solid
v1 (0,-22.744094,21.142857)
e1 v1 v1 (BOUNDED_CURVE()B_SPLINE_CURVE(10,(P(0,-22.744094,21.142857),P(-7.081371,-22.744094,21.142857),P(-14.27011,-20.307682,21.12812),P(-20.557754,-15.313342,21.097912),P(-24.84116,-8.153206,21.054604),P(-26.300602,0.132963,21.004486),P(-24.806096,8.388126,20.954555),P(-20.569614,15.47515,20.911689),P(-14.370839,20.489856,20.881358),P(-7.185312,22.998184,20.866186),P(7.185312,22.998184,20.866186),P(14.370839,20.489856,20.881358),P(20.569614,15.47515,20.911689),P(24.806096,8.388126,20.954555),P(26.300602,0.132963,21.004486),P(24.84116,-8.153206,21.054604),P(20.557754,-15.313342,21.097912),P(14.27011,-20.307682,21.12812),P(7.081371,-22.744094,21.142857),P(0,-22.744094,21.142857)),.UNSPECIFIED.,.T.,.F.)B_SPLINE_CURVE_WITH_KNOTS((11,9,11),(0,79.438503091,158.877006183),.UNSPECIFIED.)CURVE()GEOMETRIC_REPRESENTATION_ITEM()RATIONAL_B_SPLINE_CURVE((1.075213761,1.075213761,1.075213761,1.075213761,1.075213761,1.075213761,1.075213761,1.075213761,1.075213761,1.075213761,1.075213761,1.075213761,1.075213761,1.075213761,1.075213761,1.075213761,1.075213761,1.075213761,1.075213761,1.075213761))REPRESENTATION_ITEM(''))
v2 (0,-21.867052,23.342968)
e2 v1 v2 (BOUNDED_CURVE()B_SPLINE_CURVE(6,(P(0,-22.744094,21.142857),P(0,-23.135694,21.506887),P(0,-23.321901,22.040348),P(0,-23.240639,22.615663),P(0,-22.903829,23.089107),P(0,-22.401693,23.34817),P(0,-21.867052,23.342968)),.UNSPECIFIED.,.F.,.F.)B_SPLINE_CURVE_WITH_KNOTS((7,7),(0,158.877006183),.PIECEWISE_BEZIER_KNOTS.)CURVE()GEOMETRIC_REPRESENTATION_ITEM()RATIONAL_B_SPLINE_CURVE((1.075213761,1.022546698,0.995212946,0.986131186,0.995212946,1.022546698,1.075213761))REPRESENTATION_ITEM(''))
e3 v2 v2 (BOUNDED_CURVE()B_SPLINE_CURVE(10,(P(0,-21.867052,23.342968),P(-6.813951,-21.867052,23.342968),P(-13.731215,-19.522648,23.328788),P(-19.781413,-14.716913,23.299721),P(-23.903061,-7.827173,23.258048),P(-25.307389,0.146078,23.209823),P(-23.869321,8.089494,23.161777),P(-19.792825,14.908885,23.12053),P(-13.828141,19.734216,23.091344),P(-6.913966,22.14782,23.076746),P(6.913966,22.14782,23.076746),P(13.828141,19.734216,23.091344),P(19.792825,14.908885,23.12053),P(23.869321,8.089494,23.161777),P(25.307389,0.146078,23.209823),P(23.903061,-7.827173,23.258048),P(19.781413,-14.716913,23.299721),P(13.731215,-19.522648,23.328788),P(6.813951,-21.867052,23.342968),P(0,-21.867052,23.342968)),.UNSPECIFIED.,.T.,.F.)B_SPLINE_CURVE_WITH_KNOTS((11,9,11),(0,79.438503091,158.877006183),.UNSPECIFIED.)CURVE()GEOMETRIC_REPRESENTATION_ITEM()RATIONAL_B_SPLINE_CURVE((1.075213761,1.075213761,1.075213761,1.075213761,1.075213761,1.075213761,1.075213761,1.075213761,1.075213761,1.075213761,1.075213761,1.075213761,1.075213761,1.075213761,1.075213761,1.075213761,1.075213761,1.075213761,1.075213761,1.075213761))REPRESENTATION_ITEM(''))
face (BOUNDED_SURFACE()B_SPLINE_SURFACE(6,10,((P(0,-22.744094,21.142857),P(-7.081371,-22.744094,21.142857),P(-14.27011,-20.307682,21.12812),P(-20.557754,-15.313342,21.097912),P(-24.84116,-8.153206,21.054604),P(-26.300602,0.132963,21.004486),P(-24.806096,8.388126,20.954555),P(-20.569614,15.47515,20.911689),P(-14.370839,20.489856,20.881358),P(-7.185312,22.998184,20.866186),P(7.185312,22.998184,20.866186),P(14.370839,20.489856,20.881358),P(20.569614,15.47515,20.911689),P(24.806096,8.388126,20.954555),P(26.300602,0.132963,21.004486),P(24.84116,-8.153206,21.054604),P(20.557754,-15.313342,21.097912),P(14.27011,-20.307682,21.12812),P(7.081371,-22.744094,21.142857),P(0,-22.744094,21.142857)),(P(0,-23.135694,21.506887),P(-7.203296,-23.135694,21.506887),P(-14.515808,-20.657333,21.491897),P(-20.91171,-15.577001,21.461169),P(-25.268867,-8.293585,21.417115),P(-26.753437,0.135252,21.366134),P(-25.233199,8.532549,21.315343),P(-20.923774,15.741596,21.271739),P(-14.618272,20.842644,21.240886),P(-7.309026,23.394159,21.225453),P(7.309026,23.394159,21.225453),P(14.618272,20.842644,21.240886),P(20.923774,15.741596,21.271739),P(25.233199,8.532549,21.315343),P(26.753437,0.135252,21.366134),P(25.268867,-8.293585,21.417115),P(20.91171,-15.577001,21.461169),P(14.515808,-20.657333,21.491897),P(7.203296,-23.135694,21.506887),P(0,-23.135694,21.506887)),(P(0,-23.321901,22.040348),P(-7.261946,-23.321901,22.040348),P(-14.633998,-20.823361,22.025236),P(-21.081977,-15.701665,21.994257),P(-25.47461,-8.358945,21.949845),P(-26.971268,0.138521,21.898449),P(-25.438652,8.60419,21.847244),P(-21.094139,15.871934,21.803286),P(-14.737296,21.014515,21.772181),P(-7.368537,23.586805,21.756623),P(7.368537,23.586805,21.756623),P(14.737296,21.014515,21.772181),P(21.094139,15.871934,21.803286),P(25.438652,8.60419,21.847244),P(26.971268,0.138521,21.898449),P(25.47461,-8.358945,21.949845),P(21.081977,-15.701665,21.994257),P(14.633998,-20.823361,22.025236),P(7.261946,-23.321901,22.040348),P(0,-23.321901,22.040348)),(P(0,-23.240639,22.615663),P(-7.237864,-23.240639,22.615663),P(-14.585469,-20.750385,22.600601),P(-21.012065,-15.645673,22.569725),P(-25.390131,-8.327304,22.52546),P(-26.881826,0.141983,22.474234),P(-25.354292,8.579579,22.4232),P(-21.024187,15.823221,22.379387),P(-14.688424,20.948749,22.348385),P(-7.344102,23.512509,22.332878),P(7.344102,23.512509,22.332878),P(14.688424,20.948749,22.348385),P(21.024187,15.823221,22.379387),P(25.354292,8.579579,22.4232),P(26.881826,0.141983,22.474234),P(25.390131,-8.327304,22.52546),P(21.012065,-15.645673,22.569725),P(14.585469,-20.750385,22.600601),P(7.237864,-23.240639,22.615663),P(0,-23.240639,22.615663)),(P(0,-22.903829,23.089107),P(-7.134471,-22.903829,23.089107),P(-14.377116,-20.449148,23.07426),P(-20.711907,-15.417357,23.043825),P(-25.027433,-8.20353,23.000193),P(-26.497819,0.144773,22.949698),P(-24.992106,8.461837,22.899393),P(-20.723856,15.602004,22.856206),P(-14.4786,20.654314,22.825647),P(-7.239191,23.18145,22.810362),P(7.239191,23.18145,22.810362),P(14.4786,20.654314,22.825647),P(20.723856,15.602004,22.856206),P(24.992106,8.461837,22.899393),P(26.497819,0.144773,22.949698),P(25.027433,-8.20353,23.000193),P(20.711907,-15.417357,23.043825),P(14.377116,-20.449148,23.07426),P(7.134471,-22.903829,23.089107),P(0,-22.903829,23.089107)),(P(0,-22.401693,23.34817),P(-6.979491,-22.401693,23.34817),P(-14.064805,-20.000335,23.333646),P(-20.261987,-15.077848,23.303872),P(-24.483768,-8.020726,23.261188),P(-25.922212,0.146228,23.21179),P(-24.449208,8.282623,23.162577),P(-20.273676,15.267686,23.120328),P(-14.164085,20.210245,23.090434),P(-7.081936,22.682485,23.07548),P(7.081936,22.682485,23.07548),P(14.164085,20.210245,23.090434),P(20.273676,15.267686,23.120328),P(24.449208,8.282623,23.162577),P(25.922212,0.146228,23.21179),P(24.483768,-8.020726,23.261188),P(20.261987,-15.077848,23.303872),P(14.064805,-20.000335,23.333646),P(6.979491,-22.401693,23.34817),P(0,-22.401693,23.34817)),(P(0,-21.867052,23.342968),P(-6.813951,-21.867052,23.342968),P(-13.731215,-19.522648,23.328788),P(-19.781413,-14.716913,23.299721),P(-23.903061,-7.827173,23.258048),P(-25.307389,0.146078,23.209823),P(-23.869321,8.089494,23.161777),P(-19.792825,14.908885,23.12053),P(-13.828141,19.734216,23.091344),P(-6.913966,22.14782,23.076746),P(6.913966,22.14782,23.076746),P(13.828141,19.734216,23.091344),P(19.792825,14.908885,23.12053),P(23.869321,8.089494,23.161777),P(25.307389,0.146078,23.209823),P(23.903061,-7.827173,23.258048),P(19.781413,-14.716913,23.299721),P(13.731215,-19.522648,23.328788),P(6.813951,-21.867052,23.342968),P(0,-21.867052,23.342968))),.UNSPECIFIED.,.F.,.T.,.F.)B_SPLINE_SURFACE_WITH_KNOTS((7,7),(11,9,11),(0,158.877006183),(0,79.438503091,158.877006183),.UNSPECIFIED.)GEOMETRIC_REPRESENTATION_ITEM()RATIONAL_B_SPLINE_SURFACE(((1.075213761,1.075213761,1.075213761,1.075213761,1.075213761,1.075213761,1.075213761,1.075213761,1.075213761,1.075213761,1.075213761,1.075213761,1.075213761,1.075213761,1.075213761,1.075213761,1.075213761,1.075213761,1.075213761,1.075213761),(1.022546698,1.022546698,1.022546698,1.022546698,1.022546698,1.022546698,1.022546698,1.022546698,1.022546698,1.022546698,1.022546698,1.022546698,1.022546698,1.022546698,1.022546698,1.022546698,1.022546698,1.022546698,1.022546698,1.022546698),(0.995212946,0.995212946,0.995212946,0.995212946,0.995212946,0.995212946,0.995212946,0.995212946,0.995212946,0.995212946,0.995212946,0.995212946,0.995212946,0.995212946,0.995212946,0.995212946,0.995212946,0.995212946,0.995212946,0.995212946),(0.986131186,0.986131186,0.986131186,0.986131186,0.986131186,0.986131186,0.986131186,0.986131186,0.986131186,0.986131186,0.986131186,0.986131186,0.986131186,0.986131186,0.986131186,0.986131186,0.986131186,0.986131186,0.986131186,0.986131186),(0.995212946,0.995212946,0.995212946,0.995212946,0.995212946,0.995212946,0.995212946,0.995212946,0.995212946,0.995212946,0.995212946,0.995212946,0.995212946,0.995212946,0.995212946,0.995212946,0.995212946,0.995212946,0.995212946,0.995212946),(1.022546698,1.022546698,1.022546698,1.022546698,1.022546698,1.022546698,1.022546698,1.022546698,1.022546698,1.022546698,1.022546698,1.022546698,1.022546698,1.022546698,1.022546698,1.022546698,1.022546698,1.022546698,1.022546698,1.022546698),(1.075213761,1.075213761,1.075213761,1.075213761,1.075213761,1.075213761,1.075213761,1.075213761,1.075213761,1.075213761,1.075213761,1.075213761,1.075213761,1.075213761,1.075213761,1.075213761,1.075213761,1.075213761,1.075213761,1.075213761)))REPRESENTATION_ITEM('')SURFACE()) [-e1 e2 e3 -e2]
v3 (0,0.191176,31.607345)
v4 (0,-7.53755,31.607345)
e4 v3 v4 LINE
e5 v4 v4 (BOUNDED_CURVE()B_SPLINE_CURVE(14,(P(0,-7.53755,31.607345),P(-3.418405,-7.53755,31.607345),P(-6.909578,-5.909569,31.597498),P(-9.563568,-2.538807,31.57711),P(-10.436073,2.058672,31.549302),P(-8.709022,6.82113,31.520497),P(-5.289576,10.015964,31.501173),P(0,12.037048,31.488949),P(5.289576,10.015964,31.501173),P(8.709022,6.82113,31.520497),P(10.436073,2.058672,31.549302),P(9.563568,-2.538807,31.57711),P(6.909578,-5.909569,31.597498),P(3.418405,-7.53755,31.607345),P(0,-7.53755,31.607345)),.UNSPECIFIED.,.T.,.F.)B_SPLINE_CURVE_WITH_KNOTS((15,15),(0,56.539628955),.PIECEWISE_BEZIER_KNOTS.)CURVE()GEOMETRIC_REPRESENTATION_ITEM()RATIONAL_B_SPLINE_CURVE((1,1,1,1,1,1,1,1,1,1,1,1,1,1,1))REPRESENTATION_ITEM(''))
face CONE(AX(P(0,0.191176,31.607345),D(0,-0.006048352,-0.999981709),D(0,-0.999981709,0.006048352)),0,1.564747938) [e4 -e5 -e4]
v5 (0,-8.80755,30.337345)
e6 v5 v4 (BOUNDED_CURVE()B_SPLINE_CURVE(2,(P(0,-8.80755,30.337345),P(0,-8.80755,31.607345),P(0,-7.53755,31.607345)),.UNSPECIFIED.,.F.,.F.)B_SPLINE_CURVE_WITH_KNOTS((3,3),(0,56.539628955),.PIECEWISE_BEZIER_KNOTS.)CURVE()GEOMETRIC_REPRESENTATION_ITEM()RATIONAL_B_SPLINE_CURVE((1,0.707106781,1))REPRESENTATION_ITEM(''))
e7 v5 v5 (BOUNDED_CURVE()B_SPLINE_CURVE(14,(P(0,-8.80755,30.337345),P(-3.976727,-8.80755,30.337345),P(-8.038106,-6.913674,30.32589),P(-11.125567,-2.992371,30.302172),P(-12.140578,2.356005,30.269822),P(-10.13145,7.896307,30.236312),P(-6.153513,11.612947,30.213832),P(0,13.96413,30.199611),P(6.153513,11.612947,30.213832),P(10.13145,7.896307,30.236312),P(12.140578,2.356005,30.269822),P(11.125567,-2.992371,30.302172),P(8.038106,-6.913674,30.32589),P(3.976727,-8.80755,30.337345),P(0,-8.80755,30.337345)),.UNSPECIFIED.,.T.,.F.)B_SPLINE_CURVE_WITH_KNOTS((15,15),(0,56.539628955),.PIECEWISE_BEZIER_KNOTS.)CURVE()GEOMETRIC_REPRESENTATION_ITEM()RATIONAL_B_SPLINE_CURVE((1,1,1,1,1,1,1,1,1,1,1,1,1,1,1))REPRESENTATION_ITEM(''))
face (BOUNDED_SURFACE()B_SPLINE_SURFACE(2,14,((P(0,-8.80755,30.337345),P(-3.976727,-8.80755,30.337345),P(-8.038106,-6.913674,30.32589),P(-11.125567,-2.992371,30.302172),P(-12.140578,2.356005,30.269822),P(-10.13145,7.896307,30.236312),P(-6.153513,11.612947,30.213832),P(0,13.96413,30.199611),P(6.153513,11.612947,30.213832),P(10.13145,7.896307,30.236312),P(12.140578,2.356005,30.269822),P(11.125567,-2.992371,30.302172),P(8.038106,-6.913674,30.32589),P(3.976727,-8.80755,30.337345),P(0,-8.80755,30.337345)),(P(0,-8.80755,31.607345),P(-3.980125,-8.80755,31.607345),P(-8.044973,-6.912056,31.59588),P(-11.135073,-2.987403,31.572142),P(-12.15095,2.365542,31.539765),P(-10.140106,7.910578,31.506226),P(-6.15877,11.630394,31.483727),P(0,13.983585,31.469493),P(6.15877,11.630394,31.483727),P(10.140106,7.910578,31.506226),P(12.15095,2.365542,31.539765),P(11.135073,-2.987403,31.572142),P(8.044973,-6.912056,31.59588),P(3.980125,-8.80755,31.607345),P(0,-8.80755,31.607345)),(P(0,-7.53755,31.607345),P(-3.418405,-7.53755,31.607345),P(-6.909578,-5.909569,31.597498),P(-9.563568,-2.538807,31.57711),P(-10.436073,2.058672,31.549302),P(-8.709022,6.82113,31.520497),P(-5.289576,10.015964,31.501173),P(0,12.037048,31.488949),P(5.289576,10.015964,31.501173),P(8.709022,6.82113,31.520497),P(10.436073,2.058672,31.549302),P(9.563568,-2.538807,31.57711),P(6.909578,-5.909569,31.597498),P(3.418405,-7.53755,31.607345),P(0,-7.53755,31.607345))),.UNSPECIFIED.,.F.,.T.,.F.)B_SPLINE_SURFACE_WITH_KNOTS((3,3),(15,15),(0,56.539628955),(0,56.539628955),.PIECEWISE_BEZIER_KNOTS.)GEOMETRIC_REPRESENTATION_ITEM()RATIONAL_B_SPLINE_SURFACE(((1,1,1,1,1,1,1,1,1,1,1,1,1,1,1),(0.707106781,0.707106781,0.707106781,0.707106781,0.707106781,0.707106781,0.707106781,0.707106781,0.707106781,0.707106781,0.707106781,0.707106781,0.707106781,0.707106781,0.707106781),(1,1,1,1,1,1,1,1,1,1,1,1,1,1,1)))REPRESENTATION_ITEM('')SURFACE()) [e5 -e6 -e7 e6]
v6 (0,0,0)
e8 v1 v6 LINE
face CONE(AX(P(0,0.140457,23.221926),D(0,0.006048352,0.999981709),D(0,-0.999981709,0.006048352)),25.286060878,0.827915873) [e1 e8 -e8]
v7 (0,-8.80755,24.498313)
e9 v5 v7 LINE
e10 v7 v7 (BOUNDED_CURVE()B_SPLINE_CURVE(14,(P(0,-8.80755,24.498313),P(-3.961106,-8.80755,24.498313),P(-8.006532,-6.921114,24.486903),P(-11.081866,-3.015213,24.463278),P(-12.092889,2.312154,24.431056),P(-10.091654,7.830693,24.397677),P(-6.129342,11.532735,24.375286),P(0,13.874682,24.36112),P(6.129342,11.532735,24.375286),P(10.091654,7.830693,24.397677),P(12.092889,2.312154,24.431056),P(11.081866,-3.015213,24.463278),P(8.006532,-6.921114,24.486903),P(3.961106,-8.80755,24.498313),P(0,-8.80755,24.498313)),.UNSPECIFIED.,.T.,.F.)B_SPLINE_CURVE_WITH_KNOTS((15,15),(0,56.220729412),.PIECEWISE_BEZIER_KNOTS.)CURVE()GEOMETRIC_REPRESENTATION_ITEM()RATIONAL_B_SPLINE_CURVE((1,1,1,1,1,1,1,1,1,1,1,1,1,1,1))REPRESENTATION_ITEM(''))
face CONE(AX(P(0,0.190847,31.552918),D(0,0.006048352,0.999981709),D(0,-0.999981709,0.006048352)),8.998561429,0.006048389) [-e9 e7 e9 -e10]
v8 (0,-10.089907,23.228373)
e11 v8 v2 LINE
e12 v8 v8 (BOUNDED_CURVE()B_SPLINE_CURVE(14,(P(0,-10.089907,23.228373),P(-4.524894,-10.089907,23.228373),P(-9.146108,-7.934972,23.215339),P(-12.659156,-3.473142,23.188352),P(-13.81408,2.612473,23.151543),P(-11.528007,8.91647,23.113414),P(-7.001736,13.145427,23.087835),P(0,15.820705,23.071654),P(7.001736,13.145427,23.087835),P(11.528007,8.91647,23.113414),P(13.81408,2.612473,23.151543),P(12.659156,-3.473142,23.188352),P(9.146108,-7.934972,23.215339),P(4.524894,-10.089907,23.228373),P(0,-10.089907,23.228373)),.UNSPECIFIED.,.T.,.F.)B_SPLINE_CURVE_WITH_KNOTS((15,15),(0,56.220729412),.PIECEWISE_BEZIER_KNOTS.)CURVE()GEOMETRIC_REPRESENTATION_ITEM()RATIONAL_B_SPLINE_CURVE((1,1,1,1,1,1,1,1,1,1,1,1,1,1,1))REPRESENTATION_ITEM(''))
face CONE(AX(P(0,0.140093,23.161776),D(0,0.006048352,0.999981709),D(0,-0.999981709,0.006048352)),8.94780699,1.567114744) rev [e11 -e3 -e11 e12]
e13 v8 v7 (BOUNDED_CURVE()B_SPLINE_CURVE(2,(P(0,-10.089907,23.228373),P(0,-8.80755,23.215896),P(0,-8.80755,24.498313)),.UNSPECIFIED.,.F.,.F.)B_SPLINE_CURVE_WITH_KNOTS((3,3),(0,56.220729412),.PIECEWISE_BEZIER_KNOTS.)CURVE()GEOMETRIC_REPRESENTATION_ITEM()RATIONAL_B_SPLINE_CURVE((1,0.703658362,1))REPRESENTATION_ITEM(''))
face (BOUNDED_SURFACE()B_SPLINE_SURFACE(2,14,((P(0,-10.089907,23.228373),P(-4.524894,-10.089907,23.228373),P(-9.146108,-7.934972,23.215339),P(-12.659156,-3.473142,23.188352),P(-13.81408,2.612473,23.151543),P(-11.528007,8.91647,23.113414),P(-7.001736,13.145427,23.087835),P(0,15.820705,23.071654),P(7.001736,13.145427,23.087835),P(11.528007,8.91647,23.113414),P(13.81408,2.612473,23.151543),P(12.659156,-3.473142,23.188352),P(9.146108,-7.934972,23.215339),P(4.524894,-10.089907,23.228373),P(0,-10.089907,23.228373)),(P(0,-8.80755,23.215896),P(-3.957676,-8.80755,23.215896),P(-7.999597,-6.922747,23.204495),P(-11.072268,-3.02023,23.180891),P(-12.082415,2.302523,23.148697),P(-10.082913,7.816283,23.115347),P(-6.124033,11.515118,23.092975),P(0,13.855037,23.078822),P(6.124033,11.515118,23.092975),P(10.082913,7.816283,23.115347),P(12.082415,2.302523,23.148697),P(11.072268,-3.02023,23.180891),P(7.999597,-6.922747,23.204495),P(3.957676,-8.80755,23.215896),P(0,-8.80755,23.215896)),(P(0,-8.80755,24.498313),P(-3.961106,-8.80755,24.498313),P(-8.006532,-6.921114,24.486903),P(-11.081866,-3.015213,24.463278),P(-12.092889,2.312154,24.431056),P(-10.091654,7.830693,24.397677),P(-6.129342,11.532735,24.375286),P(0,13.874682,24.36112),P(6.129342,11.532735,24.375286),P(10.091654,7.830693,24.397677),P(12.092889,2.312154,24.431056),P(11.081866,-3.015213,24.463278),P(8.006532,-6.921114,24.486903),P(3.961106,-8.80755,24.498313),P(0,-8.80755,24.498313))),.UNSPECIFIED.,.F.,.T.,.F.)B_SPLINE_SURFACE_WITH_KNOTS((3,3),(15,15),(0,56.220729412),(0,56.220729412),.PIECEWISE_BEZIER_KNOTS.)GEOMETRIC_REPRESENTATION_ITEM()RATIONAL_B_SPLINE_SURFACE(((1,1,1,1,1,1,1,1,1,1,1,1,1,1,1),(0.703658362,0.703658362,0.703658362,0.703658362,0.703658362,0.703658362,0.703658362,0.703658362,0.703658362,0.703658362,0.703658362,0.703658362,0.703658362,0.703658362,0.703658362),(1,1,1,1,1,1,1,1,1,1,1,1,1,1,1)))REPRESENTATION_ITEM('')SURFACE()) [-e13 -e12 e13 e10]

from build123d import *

# Parameters (mm, degrees)
F4_R = 1.27
F5_R = 1.27


# Not quite as in the source:
# - the program builds the solid bodies; features that only make, move or delete a surface that nothing else refers to are left out


with BuildPart() as f1:
    # F0 (on Right) → F1 (revolve)
    with BuildSketch(Plane.YZ):
        Polygon((-25.1451414078, 23.3748648316), (0, 0), (0.1911758445, 31.6073447466), (-8.8075501844, 31.6073447466), (-8.8075501844, 23.2158955187), align=None)
    revolve(axis=Axis((0, 0.0955879223, 15.8036723733), (0, -0.006048352, -0.9999817086)))

    # F4
    f4_edges = [f1.edges().sort_by_distance(p)[0] for p in [
        (0, 25.426055, 23.068987),
    ]]
    fillet(f4_edges, radius=F4_R)

    # F5
    f5_edges = [f1.edges().sort_by_distance(p)[0] for p in [
        (0, 9.189243, 31.498492),
        (0, 9.087736, 23.107657),
        (0, -8.80755, 27.41162),
        (0, -15.337301, 23.279432),
        (0, 22.14782, 23.076746),
    ]]
    fillet(f5_edges, radius=F5_R)


solid = f1.part
